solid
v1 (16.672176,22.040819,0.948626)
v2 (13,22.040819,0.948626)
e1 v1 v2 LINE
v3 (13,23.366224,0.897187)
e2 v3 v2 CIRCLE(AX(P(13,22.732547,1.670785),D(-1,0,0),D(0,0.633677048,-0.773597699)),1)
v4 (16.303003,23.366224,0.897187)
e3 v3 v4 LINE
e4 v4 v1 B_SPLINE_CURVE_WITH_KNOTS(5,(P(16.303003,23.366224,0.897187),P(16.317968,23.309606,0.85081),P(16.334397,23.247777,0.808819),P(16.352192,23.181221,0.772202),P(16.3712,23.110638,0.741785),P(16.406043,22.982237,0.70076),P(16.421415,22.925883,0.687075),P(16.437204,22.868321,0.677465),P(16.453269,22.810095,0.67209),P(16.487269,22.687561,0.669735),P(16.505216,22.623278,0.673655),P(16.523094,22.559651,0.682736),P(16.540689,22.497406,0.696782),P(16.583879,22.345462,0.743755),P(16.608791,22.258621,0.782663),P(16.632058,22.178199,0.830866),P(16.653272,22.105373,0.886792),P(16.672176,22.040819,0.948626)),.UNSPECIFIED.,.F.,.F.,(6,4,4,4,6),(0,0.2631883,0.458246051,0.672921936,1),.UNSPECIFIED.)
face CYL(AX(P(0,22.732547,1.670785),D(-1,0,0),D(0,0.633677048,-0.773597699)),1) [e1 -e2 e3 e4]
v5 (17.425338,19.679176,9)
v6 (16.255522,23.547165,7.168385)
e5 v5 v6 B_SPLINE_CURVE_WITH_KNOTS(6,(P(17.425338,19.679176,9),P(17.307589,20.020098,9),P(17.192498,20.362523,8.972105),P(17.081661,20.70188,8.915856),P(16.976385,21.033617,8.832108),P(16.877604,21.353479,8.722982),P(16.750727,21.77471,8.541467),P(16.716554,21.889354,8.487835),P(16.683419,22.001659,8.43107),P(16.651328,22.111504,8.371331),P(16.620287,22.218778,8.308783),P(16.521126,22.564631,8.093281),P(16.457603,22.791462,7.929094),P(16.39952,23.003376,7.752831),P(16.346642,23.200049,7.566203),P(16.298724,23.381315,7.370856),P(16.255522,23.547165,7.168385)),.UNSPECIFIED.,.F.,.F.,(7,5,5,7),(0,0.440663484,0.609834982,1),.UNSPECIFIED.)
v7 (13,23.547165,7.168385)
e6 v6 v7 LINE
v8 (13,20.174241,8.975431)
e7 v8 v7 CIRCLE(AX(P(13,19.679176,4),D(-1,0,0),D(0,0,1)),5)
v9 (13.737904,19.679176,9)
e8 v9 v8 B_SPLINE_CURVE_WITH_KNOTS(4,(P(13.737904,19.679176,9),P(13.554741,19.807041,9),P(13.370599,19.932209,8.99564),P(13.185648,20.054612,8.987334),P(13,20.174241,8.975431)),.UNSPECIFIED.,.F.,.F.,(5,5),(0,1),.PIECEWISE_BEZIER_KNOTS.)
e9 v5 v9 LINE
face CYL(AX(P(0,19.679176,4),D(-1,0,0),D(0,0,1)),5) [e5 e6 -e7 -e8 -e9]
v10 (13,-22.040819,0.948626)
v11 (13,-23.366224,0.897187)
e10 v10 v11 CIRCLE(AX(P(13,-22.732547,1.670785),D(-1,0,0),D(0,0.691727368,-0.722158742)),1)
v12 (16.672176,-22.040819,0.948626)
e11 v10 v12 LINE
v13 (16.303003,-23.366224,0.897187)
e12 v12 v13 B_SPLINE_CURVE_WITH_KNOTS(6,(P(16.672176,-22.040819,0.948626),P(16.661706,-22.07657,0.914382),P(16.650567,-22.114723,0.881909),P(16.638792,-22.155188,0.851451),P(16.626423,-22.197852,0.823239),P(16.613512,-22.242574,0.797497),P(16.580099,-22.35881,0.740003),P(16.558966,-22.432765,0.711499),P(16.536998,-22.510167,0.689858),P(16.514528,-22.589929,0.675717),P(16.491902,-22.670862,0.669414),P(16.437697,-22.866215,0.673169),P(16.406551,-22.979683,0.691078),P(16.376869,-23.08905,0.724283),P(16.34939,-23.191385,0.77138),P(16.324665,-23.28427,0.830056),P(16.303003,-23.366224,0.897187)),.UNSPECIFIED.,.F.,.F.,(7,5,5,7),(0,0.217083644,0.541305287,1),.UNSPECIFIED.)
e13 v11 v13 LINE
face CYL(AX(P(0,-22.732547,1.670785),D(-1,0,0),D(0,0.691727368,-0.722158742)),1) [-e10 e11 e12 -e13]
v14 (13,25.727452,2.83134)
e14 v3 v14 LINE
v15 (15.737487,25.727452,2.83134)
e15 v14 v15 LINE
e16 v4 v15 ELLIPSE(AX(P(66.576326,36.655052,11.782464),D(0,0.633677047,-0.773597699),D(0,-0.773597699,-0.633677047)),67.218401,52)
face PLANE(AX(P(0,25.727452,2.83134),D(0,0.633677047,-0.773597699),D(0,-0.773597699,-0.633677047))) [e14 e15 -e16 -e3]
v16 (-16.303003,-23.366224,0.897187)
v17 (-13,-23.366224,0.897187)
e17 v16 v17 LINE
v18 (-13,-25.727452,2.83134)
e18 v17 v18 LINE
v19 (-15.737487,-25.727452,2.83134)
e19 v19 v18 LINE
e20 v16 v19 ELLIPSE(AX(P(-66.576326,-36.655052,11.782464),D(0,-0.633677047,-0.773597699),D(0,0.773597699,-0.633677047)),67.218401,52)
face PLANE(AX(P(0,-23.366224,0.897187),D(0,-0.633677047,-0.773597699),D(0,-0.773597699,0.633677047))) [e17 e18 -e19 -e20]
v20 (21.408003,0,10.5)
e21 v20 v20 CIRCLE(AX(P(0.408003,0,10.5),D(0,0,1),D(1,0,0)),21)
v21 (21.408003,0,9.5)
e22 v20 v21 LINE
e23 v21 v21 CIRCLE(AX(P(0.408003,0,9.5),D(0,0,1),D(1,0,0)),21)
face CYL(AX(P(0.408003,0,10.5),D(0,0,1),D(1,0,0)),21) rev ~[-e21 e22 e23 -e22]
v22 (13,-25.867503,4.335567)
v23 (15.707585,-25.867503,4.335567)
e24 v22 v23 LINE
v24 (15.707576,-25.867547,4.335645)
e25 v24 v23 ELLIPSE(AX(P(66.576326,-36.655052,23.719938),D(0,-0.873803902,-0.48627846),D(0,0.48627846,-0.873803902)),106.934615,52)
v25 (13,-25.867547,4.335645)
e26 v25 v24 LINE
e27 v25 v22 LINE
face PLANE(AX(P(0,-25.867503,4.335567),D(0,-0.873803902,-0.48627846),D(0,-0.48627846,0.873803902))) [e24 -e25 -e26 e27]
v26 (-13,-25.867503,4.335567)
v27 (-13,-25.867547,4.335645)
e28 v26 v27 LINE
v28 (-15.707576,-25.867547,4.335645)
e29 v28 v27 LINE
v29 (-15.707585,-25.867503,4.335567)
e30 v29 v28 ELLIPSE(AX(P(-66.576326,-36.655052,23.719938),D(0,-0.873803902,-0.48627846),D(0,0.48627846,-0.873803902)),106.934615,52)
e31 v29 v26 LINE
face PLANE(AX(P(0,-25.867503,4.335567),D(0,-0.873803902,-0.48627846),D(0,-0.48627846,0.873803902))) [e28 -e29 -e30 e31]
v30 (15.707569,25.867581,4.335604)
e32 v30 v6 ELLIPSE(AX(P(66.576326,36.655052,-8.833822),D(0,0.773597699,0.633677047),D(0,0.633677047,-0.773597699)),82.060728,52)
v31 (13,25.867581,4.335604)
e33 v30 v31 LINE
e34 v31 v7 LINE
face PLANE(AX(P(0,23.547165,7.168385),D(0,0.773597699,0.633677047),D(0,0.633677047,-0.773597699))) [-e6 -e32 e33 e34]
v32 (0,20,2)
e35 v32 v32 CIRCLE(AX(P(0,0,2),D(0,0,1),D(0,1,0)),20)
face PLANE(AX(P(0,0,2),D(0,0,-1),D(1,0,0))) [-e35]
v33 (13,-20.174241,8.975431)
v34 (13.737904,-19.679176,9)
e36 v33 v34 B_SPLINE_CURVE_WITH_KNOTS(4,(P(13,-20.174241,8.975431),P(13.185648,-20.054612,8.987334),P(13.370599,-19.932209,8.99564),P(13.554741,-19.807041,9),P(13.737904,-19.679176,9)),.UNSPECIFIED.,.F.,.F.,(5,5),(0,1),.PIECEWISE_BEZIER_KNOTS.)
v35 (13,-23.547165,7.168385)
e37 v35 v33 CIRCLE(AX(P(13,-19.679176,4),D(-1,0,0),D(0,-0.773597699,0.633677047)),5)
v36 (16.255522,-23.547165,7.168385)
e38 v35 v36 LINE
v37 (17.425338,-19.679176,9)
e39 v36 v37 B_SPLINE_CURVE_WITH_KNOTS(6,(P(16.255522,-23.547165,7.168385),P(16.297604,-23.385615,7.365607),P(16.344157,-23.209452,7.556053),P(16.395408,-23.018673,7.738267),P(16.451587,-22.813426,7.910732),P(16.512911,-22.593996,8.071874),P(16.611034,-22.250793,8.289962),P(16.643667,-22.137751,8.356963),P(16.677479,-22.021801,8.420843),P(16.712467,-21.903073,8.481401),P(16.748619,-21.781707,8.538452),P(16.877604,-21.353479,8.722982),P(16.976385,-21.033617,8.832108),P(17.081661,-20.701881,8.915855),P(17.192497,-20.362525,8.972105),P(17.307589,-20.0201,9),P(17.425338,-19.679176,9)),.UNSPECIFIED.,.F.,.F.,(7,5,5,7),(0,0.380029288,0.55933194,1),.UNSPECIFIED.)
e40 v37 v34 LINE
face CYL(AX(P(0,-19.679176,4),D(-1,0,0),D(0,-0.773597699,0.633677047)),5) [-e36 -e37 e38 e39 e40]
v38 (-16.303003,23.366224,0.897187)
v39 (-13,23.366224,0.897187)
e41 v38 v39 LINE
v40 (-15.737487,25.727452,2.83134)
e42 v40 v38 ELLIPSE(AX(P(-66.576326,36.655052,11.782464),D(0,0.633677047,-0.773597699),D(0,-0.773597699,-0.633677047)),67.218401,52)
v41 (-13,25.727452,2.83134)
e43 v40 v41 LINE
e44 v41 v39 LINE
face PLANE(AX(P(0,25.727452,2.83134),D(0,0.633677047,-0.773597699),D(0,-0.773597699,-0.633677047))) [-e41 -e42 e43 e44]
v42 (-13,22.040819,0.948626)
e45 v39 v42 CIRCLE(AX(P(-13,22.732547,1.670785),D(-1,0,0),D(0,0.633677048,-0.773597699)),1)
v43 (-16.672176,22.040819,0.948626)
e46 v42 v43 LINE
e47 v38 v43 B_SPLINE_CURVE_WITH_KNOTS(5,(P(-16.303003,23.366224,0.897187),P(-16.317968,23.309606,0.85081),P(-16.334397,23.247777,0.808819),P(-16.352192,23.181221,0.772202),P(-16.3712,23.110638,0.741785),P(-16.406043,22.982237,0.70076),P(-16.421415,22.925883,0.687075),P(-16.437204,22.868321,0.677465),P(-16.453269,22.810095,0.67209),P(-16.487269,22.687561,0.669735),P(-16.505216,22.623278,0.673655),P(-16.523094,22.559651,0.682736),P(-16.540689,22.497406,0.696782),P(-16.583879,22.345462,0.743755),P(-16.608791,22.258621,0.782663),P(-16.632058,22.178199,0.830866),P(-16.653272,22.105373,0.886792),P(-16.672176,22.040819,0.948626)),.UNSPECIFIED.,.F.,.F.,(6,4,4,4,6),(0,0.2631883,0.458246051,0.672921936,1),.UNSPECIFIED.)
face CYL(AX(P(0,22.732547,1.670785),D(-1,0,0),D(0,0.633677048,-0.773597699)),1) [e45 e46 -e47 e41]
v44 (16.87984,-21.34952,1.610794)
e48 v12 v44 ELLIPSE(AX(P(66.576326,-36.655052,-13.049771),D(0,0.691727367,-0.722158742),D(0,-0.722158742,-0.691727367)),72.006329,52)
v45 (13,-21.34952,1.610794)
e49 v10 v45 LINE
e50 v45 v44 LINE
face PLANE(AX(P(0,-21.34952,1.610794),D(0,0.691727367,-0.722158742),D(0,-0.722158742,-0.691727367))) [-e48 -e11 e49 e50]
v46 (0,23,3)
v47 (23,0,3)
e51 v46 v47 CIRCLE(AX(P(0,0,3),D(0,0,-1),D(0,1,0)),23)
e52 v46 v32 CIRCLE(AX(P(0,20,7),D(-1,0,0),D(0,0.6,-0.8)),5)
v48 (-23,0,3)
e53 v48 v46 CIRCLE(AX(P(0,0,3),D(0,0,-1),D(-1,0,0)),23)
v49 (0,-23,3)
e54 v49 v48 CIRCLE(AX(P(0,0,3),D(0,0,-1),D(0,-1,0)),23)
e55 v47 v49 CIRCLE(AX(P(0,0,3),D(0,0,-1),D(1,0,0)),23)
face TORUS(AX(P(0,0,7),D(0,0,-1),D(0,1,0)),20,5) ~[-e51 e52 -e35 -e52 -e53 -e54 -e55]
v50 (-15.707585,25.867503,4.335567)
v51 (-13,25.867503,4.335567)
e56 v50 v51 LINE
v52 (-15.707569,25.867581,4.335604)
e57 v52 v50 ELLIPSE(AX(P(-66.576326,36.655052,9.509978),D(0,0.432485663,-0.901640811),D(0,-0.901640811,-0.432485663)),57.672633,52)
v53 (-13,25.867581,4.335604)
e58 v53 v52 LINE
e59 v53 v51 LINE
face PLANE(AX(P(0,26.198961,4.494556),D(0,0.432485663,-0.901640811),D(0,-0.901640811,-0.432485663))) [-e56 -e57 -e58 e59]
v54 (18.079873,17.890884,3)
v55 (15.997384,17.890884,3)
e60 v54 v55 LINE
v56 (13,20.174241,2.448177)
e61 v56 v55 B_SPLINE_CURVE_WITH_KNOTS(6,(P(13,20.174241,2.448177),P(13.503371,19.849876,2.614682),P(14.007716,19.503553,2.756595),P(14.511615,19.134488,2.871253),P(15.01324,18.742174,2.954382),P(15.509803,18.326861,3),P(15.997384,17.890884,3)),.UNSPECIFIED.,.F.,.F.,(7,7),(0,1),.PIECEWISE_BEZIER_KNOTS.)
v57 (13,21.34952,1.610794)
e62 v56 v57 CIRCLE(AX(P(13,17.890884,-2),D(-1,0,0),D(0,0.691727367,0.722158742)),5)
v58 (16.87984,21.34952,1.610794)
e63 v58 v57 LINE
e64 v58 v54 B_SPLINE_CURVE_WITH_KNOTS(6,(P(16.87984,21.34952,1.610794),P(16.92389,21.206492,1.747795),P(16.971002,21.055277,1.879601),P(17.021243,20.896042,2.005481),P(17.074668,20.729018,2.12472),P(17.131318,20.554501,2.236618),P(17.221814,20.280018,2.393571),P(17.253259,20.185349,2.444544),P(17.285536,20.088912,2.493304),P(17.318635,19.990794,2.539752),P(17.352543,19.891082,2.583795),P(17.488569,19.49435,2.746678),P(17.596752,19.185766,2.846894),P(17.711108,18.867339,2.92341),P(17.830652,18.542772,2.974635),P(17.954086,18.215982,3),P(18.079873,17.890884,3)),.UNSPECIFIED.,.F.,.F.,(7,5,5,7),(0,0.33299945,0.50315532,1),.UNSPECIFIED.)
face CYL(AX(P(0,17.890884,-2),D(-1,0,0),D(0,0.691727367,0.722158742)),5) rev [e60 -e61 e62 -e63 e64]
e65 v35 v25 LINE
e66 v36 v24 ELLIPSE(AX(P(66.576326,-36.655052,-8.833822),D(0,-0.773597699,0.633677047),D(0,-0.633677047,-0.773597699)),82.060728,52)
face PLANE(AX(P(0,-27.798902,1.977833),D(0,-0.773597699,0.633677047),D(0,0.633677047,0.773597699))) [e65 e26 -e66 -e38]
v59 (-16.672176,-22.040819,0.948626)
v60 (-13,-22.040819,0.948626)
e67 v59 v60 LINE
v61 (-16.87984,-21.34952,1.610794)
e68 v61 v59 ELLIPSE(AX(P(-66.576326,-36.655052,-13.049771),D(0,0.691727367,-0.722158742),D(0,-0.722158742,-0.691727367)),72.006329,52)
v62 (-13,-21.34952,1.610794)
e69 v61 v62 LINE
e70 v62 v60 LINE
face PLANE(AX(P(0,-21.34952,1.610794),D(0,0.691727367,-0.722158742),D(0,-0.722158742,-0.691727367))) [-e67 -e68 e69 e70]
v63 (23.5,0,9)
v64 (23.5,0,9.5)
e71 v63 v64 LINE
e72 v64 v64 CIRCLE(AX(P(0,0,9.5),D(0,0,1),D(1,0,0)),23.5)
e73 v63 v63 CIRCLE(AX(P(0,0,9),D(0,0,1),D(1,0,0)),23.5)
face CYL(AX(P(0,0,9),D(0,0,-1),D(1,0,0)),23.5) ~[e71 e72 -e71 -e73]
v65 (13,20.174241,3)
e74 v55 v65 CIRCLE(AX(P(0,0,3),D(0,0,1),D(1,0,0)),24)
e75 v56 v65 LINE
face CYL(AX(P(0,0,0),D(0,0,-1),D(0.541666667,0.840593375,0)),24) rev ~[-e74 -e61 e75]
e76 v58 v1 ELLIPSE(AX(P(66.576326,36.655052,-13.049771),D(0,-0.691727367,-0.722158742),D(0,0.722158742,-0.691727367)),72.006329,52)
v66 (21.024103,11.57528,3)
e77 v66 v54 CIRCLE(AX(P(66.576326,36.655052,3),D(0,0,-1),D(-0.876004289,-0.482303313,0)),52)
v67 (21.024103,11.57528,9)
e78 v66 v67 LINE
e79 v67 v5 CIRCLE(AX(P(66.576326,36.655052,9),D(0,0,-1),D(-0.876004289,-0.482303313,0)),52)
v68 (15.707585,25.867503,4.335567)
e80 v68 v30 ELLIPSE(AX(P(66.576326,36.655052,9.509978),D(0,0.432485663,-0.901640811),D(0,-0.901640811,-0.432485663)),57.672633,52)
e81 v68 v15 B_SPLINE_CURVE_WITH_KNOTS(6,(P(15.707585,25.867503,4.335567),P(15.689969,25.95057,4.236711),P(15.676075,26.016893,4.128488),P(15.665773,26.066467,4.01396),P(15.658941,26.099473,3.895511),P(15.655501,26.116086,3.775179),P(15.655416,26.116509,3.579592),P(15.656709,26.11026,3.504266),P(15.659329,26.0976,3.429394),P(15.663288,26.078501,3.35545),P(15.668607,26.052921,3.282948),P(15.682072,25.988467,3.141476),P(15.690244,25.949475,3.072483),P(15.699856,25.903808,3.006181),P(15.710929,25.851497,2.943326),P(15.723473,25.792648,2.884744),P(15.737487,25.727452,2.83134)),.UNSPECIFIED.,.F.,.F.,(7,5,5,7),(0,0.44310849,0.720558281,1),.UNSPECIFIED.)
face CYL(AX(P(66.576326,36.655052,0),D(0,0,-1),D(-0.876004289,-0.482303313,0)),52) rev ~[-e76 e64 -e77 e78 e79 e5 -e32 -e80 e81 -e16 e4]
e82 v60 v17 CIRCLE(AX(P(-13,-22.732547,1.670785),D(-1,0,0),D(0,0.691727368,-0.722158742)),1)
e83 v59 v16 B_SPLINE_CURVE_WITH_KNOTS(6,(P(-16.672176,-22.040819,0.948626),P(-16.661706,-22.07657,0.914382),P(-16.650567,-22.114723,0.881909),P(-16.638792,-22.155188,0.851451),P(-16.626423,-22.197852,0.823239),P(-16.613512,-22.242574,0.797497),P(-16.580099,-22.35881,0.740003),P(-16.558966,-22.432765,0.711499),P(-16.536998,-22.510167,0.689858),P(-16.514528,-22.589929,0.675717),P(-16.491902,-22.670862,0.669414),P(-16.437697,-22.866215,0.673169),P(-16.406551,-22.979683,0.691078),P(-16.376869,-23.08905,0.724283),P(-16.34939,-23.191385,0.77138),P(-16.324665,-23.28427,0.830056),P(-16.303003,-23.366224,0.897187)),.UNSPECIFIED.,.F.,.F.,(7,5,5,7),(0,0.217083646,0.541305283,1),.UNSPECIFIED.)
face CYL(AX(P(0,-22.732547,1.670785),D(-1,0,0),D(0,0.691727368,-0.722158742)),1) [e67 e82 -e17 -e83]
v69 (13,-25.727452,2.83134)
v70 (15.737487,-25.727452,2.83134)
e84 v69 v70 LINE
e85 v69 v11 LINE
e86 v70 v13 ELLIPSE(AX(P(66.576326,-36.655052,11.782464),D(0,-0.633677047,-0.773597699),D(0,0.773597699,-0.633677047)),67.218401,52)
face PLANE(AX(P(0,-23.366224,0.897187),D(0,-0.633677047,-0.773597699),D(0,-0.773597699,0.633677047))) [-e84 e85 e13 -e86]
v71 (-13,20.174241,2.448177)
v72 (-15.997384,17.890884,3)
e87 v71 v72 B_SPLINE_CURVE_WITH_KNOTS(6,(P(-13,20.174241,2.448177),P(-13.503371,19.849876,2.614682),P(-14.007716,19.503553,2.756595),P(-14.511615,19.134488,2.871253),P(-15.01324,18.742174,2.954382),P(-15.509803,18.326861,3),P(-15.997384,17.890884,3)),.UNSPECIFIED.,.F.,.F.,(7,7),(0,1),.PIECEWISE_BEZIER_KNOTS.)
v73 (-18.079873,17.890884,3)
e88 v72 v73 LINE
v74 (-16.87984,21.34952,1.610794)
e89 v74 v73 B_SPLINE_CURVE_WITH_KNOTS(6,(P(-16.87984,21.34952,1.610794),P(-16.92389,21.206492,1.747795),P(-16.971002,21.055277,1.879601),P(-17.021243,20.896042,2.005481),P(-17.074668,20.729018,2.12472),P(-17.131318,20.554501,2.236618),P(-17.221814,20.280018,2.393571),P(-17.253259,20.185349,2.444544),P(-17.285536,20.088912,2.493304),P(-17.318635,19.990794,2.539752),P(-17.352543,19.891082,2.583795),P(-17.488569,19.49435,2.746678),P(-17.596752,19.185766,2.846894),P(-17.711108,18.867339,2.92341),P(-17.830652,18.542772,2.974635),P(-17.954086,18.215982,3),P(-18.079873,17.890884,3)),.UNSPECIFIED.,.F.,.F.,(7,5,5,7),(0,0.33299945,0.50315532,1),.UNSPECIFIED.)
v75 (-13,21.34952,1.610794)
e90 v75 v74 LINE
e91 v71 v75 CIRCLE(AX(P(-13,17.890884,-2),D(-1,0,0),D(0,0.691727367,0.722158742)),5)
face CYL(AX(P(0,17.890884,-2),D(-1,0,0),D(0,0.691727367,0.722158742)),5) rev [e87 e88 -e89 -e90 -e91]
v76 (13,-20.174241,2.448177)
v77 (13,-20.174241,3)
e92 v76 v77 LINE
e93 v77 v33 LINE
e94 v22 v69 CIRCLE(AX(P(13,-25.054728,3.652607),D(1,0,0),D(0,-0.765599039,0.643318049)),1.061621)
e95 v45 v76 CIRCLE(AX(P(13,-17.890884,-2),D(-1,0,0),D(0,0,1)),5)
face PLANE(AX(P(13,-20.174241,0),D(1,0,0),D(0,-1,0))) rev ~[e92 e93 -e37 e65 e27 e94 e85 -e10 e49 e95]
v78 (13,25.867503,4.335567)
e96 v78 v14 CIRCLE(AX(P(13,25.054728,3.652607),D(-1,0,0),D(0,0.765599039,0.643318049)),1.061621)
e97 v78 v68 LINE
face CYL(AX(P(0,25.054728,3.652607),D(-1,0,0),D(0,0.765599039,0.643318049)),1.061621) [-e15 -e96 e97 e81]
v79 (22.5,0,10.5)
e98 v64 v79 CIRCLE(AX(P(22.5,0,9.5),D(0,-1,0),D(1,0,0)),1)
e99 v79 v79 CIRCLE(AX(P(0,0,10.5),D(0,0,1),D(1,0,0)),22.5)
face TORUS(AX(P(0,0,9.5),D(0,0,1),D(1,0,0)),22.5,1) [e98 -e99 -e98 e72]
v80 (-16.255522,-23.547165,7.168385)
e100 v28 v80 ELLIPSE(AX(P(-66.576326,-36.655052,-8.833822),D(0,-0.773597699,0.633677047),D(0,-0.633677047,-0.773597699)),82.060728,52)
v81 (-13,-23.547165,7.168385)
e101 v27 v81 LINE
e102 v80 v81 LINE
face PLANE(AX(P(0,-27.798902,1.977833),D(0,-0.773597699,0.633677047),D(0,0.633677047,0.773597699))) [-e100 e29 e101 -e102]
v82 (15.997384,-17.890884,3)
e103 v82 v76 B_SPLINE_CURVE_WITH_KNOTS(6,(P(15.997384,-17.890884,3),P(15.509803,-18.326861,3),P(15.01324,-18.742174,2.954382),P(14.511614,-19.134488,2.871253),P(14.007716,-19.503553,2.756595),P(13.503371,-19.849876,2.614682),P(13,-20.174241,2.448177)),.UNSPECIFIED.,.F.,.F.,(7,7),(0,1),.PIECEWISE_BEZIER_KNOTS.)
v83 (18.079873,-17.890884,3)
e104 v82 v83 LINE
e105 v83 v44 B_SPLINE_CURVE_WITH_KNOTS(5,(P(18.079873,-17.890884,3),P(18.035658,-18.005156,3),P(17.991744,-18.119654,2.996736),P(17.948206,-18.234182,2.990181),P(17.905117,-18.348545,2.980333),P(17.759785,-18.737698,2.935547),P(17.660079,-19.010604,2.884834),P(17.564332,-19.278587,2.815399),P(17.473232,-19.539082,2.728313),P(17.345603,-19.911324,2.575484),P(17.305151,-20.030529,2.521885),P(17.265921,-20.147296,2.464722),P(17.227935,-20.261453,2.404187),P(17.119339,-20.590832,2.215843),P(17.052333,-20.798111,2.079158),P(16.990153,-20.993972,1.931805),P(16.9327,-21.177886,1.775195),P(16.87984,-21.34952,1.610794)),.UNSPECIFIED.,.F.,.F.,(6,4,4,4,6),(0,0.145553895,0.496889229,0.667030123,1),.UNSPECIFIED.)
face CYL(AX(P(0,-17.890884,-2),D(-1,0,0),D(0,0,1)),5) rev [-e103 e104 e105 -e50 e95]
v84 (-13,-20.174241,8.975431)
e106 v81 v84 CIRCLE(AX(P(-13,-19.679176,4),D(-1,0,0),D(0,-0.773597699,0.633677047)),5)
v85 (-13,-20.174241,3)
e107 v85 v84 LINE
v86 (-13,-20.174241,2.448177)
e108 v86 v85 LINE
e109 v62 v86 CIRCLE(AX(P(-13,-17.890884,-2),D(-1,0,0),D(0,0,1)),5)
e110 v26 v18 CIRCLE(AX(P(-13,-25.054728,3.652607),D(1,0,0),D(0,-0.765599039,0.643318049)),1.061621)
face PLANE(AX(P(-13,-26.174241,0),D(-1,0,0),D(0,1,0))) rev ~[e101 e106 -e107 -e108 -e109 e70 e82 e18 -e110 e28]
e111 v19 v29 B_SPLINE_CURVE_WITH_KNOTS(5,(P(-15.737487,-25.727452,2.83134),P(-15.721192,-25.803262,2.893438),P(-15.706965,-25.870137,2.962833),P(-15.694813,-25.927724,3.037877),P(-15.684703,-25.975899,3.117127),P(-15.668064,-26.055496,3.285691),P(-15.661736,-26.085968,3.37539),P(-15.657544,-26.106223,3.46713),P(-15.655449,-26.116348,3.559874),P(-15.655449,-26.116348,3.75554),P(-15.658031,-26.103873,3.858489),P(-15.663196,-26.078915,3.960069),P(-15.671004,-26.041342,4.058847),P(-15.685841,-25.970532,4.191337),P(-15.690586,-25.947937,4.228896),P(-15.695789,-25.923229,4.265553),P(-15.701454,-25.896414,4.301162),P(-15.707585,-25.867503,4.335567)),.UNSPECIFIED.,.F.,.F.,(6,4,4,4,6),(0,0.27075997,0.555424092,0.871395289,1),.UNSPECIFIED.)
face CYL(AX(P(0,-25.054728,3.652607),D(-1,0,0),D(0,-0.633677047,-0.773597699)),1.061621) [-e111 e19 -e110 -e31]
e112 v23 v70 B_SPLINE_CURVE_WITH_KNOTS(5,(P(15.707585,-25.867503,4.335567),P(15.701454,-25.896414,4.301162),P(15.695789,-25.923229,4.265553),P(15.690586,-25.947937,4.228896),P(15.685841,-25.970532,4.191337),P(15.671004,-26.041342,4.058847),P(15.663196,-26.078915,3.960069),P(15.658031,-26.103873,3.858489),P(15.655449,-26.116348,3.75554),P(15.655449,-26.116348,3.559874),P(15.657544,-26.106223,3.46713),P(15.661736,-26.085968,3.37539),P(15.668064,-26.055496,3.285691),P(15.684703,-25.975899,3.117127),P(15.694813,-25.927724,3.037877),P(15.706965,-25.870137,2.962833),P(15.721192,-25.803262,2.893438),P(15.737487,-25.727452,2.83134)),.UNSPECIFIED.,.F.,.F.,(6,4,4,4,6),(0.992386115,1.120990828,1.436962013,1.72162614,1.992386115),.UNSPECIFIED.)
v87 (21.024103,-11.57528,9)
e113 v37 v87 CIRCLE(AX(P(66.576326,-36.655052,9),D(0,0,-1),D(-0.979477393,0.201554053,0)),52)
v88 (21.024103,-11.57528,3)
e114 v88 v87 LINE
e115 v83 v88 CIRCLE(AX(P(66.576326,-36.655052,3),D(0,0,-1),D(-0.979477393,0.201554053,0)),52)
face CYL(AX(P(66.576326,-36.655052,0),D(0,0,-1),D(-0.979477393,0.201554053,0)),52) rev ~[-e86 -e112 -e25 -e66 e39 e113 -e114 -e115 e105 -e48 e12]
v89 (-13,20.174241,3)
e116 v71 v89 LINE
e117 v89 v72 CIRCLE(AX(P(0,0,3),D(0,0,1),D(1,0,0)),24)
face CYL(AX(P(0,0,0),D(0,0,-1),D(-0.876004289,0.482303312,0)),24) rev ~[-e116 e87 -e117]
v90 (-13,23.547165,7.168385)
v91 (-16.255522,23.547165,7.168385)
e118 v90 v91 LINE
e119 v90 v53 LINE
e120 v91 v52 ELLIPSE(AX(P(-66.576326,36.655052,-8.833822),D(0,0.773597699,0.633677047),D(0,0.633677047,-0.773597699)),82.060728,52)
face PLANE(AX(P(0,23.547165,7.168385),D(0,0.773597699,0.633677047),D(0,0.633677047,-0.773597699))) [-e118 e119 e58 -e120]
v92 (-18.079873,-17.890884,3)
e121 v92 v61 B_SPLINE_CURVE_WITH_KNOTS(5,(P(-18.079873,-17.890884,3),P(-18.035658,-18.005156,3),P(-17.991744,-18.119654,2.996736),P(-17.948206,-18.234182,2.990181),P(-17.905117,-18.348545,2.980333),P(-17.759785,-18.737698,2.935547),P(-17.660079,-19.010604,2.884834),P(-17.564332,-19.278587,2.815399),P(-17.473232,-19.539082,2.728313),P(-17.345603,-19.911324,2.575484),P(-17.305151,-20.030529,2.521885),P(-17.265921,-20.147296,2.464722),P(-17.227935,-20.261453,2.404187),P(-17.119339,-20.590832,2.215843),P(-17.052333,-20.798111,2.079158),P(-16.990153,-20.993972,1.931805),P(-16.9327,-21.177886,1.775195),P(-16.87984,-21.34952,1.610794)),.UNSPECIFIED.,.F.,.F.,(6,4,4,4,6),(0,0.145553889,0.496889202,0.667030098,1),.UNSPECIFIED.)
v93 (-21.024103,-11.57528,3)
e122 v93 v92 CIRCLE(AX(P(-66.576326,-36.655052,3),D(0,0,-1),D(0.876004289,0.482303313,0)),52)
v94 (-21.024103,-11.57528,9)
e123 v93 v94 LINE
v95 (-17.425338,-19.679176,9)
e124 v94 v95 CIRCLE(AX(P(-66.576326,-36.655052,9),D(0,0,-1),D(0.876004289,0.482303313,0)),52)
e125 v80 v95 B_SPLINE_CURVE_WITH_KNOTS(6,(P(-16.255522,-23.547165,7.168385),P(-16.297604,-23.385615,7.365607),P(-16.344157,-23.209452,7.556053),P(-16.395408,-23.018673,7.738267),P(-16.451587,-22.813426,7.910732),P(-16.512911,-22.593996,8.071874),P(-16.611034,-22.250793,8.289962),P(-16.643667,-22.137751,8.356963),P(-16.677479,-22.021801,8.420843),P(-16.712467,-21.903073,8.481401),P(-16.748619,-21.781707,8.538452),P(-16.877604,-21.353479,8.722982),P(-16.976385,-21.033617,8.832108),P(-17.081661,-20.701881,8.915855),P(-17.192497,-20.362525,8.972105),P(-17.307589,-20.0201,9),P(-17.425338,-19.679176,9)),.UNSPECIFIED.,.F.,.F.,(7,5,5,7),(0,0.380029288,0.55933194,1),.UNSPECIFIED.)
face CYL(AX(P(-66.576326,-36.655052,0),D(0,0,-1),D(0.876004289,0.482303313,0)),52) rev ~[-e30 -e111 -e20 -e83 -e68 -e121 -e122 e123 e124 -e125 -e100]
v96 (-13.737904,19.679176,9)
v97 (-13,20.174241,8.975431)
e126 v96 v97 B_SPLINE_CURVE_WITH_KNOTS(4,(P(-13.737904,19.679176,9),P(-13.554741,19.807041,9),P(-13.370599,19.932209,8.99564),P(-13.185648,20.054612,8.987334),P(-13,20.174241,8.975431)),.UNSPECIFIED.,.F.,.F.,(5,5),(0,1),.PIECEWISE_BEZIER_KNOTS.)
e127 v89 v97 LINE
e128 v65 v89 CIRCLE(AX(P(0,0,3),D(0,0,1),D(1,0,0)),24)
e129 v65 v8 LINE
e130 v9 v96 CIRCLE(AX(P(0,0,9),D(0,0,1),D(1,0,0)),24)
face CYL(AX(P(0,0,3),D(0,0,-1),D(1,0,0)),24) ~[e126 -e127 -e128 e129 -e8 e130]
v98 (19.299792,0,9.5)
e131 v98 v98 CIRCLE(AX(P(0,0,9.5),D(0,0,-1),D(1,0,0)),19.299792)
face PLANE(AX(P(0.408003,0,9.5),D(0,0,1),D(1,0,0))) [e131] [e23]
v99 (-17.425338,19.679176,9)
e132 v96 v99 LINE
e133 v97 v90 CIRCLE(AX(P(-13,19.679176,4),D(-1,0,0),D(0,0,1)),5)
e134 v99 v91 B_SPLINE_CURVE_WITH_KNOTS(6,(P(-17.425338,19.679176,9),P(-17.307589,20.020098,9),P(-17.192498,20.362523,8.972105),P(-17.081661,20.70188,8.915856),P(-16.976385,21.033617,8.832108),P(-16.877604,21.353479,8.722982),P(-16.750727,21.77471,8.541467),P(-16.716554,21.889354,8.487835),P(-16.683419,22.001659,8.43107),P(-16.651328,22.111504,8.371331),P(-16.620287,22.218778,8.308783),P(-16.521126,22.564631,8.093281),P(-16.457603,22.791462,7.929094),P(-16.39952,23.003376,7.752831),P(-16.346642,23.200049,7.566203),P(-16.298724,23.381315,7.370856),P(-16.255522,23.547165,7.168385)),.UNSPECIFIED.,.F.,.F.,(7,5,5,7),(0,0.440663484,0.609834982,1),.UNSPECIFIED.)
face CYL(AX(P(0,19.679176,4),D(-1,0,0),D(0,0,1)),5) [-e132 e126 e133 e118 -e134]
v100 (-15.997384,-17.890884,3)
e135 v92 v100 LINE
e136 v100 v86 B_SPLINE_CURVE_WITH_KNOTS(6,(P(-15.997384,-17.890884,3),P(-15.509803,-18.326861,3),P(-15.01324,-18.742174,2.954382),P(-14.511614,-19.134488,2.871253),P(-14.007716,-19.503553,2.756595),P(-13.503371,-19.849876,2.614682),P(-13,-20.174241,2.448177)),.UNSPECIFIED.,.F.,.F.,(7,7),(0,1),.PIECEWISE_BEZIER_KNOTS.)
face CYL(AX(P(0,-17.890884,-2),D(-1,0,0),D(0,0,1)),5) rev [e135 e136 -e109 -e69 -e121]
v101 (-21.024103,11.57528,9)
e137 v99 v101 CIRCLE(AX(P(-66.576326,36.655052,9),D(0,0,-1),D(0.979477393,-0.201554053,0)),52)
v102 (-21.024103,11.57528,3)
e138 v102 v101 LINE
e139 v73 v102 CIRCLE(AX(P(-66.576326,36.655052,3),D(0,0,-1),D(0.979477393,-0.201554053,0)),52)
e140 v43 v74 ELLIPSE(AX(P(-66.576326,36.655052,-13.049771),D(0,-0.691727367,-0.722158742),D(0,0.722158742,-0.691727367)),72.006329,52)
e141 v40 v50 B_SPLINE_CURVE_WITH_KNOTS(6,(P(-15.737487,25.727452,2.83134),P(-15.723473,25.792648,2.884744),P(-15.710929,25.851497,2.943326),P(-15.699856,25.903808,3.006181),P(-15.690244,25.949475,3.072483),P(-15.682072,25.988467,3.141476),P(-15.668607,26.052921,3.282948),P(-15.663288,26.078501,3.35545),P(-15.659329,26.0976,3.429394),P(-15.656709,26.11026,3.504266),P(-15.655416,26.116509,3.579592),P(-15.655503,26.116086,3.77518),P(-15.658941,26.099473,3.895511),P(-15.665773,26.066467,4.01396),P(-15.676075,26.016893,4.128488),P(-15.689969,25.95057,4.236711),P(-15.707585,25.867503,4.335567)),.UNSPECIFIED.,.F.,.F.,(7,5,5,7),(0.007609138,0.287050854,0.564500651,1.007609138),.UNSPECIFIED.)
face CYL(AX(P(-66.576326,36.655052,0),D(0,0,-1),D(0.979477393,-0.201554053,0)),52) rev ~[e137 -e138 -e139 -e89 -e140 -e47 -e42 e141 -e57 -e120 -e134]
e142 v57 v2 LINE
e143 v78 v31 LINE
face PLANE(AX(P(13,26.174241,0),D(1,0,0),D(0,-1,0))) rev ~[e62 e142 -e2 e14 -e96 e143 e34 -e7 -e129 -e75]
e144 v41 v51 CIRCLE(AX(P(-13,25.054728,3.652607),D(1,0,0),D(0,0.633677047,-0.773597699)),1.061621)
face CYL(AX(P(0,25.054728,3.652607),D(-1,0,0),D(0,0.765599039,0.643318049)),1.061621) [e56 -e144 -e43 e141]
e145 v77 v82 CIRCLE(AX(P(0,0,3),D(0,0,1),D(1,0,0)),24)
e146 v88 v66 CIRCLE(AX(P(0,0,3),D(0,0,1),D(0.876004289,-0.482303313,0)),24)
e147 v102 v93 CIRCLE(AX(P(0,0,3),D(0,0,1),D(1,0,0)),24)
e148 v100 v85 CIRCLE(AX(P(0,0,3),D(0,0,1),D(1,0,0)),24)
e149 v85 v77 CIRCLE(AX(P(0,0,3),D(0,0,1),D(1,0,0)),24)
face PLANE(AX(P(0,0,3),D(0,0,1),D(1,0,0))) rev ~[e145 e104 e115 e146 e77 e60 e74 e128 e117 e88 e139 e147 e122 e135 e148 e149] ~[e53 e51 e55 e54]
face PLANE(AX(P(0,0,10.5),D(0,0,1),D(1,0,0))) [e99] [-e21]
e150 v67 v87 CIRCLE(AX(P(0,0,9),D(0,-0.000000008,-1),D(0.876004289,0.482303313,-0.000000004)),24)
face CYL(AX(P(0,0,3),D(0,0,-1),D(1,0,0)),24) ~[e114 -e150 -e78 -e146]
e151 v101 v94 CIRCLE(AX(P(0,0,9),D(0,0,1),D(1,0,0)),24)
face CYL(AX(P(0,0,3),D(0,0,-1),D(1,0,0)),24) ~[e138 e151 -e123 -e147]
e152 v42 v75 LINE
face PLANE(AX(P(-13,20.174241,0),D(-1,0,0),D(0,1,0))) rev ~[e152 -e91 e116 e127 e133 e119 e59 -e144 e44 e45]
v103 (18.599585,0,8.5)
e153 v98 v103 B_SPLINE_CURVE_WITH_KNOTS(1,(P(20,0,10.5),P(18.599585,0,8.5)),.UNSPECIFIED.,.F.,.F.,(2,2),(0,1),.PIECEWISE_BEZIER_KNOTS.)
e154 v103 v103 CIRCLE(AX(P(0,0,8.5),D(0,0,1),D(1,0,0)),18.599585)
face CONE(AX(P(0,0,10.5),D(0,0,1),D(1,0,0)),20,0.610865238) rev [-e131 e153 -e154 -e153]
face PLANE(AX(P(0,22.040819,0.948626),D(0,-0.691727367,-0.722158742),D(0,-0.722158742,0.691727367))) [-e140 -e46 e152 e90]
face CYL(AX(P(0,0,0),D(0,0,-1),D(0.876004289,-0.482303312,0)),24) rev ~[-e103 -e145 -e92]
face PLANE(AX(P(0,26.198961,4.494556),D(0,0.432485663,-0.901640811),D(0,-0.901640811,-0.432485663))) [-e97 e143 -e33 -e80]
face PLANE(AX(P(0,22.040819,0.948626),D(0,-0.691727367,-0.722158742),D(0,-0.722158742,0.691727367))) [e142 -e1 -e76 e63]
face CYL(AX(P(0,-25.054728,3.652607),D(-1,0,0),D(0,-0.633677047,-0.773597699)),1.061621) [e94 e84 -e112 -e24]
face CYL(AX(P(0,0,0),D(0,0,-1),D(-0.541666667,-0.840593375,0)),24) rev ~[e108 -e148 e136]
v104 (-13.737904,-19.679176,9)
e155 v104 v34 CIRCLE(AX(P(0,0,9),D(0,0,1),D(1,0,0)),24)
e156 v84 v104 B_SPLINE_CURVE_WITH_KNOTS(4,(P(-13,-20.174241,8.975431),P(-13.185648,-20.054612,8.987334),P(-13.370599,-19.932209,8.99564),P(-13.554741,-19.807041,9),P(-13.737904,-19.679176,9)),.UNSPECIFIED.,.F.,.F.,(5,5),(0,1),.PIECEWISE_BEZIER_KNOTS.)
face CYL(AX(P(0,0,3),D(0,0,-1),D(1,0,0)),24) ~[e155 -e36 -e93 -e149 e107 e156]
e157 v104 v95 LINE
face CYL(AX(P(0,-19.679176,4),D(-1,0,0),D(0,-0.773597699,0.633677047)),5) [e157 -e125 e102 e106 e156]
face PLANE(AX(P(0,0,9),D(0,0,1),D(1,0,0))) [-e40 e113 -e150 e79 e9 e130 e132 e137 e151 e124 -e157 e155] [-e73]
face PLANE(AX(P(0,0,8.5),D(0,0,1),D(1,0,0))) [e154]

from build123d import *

# Parameters (mm, degrees)
F3_DEPTH      = 25
F6_DEPTH      = 25
F6_DEPTH_BACK = 25
F8_DEPTH      = 25
F8_DEPTH_BACK = 25
F10_R         = 24
F11_DEPTH     = 6
F13_DEPTH     = 1
F15_R         = 23.5
F16_DEPTH     = 1.5
F17_R         = 1
F18_R         = 20
F19_DEPTH     = 2
F19_TAPER     = 35
F20_R         = 21
F21_DEPTH     = 1


# Not quite as in the source:
# - a fillet or chamfer that OpenCascade refuses, or shapes differently, is made with other operations: its cross-section is extruded or revolved along the edge and cut away or added


with BuildPart() as f3:
    # F2 (on Top) → F3 (new body)
    with BuildSketch(Plane.XY):
        with BuildLine():
            Line((-13, 20.1742410018), (-13, 26.1742410018))
            Line((-13, 26.1742410018), (-15.6435015354, 26.1742410018))
            ThreePointArc((-15.6435015354, 26.1742410018), (-17.78469231, 18.672379989), (-21.0241029415, 11.5752795))
            ThreePointArc((-21.0241029415, 11.5752795), (-17.5469493067, 16.3738990478), (-13, 20.1742410018))
        make_face()
    extrude(amount=F3_DEPTH)


with BuildPart() as f3b:
    # F2 (on Top) → F3, piece 2 (new body)
    with BuildSketch(Plane.XY):
        with BuildLine():
            Line((13, 26.1742410018), (13, 20.1742410018))
            ThreePointArc((13, 20.1742410018), (17.5469493067, 16.3738990478), (21.0241029415, 11.5752795))
            ThreePointArc((21.0241029415, 11.5752795), (17.78469231, 18.672379989), (15.6435015354, 26.1742410018))
            Line((15.6435015354, 26.1742410018), (13, 26.1742410018))
        make_face()
    extrude(amount=F3_DEPTH)


with BuildPart() as f3c:
    # F2 (on Top) → F3, piece 3 (new body)
    with BuildSketch(Plane.XY):
        with BuildLine():
            ThreePointArc((-13, -20.1742410018), (-17.5469493067, -16.3738990478), (-21.0241029415, -11.5752795))
            ThreePointArc((-21.0241029415, -11.5752795), (-17.78469231, -18.672379989), (-15.6435015354, -26.1742410018))
            Line((-15.6435015354, -26.1742410018), (-13, -26.1742410018))
            Line((-13, -26.1742410018), (-13, -20.1742410018))
        make_face()
    extrude(amount=F3_DEPTH)


with BuildPart() as f3d:
    # F2 (on Top) → F3, piece 4 (new body)
    with BuildSketch(Plane.XY):
        with BuildLine():
            ThreePointArc((15.6435015354, -26.1742410018), (17.78469231, -18.672379989), (21.0241029415, -11.5752795))
            ThreePointArc((21.0241029415, -11.5752795), (17.5469493067, -16.3738990478), (13, -20.1742410018))
            Line((13, -20.1742410018), (13, -26.1742410018))
            Line((13, -26.1742410018), (15.6435015354, -26.1742410018))
        make_face()
    extrude(amount=F3_DEPTH)


with BuildPart() as f6_tool:
    # F5 (on Right) → F6 (new body, two sides)
    with BuildSketch(Plane.YZ) as f6_sk:
        with BuildLine():
            Line((23.5471649475, 7.1683851421), (27.7989016838, 1.9778330012))
            Line((27.7989016838, 1.9778330012), (27.7989016838, 26.740285454))
            Line((27.7989016838, 26.740285454), (-29.0615007661, 26.740285454))
            Line((-29.0615007661, 26.740285454), (-27.7989016838, 1.9778330012))
            Line((-27.7989016838, 1.9778330012), (-23.5471649475, 7.1683851421))
            ThreePointArc((-23.5471649475, 7.1683851421), (-21.8190448857, 8.5189558788), (-19.6791764535, 8.999999905))
            Line((-19.6791764535, 8.999999905), (0, 8.999999905))
            Line((0, 8.999999905), (19.6791764535, 8.999999905))
            ThreePointArc((19.6791764535, 8.999999905), (21.8190448857, 8.5189558788), (23.5471649475, 7.1683851421))
        make_face()
    extrude(amount=-F6_DEPTH)
    extrude(f6_sk.sketch, amount=F6_DEPTH_BACK)


with BuildPart() as f3_1:
    add(f3.part)

    # F6: cut by f6_tool
    add(f6_tool.part, mode=Mode.SUBTRACT)


with BuildPart() as f3b_1:
    add(f3b.part)

    # F6: cut by f6_tool
    add(f6_tool.part, mode=Mode.SUBTRACT)


with BuildPart() as f3c_1:
    add(f3c.part)

    # F6: cut by f6_tool
    add(f6_tool.part, mode=Mode.SUBTRACT)


with BuildPart() as f3d_1:
    add(f3d.part)

    # F6: cut by f6_tool
    add(f6_tool.part, mode=Mode.SUBTRACT)


with BuildPart() as f8_tool:
    # F7 (on Right) → F8 (new body, two sides)
    with BuildSketch(Plane.YZ) as f8_sk:
        with BuildLine():
            Line((17.8908835105, 3), (0, 3))
            Line((0, 3), (-17.8908835105, 3))
            ThreePointArc((-17.8908835105, 3), (-19.7544863974, 2.639718125), (-21.3495203475, 1.6107937119))
            Line((-21.3495203475, 1.6107937119), (-22.0408191574, 0.9486258563))
            ThreePointArc((-22.0408191574, 0.9486258563), (-22.6937657116, 0.6715368573), (-23.3662235722, 0.8971868999))
            Line((-23.3662235722, 0.8971868999), (-25.727452218, 2.8313400119))
            ThreePointArc((-25.727452218, 2.8313400119), (-26.1117766069, 3.5541907786), (-25.8675033398, 4.3355671527))
            Line((-25.8675033398, 4.3355671527), (-26.6892556101, 5.8121909387))
            Line((-26.6892556101, 5.8121909387), (-28.4930374473, 3.2282707538))
            Line((-28.4930374473, 3.2282707538), (-28.1138848513, -2.6890258305))
            Line((-28.1138848513, -2.6890258305), (27.818409726, -2.2570919245))
            Line((27.818409726, -2.2570919245), (26.8063536115, 3.2282707538))
            Line((26.8063536115, 3.2282707538), (26.1989608407, 4.4945557602))
            Line((26.1989608407, 4.4945557602), (25.8675033398, 4.3355671527))
            ThreePointArc((25.8675033398, 4.3355671527), (26.1117766069, 3.5541907786), (25.727452218, 2.8313400119))
            Line((25.727452218, 2.8313400119), (23.3662235722, 0.8971868999))
            ThreePointArc((23.3662235722, 0.8971868999), (22.6937657116, 0.6715368573), (22.0408191574, 0.9486258563))
            Line((22.0408191574, 0.9486258563), (21.3495203475, 1.6107937119))
            ThreePointArc((21.3495203475, 1.6107937119), (19.7544863974, 2.639718125), (17.8908835105, 3))
        make_face()
    extrude(amount=-F8_DEPTH)
    extrude(f8_sk.sketch, amount=F8_DEPTH_BACK)


with BuildPart() as f3_2:
    add(f3_1.part)

    # F8: cut by f8_tool
    add(f8_tool.part, mode=Mode.SUBTRACT)



with BuildPart() as f3b_2:
    add(f3b_1.part)

    # F8: cut by f8_tool
    add(f8_tool.part, mode=Mode.SUBTRACT)


with BuildPart() as f3c_2:
    add(f3c_1.part)

    # F8: cut by f8_tool
    add(f8_tool.part, mode=Mode.SUBTRACT)


with BuildPart() as f3d_2:
    add(f3d_1.part)

    # F8: cut by f8_tool
    add(f8_tool.part, mode=Mode.SUBTRACT)


with BuildPart() as f3_3:
    add(f3_2.part)

    add(f3b_2.part)  # F11 merges F3b

    add(f3c_2.part)  # F11 merges F3c

    add(f3d_2.part)  # F11 merges F3d
    # F10 (on plane+point) → F11 (join)
    with BuildSketch(Plane.XY.offset(3)):
        Circle(F10_R)
    extrude(amount=F11_DEPTH)

    # F12 (on face) → F13 (join)
    with BuildSketch(Plane(origin=(0, 0, 3), x_dir=(1, 0, 0), z_dir=(0, 0, -1))):
        with BuildLine():
            ThreePointArc((23, 0), (16.2634559673, 16.2634559673), (0, 23))
            ThreePointArc((0, 23), (-16.2634559673, 16.2634559673), (-23, 0))
            ThreePointArc((-23, 0), (-16.2634559673, -16.2634559673), (0, -23))
            ThreePointArc((0, -23), (16.2634559673, -16.2634559673), (23, 0))
        make_face()
    extrude(amount=F13_DEPTH)

    # F14: fillet of radius 5 on 1 edges, made by hand

    # F14_s1 → F14_t2 (revolve, cut)
    with BuildSketch(Plane.YZ):
        with BuildLine():
            ThreePointArc((23, 3), (21.5811388301, 2.2565835097), (20, 2))
            Line((20, 2), (23, 2))
            Line((23, 2), (23, 3))
        make_face()
    revolve(axis=Axis((0, 0, 2), (0, 0, 1)), mode=Mode.SUBTRACT)

    # F15 (on face) → F16 (join)
    with BuildSketch(Plane.XY.offset(8.999999905)):
        Circle(F15_R)
    extrude(amount=F16_DEPTH)

    # F17
    f17_edges = [f3_3.edges().sort_by_distance(p)[0] for p in [
        (-23.5, 0, 10.5),
    ]]
    fillet(f17_edges, radius=F17_R)

    # F18 (on face) → F19 (cut)
    with BuildSketch(Plane.XY.offset(10.499999905)):
        Circle(F18_R)
    extrude(amount=-F19_DEPTH, taper=F19_TAPER, mode=Mode.SUBTRACT)

    # F20 (on face) → F21 (cut)
    with BuildSketch(Plane.XY.offset(10.499999905)):
        with Locations((0.4080029248, 0)):
            Circle(F20_R)
    extrude(amount=-F21_DEPTH, mode=Mode.SUBTRACT)


solid = f3_3.part
